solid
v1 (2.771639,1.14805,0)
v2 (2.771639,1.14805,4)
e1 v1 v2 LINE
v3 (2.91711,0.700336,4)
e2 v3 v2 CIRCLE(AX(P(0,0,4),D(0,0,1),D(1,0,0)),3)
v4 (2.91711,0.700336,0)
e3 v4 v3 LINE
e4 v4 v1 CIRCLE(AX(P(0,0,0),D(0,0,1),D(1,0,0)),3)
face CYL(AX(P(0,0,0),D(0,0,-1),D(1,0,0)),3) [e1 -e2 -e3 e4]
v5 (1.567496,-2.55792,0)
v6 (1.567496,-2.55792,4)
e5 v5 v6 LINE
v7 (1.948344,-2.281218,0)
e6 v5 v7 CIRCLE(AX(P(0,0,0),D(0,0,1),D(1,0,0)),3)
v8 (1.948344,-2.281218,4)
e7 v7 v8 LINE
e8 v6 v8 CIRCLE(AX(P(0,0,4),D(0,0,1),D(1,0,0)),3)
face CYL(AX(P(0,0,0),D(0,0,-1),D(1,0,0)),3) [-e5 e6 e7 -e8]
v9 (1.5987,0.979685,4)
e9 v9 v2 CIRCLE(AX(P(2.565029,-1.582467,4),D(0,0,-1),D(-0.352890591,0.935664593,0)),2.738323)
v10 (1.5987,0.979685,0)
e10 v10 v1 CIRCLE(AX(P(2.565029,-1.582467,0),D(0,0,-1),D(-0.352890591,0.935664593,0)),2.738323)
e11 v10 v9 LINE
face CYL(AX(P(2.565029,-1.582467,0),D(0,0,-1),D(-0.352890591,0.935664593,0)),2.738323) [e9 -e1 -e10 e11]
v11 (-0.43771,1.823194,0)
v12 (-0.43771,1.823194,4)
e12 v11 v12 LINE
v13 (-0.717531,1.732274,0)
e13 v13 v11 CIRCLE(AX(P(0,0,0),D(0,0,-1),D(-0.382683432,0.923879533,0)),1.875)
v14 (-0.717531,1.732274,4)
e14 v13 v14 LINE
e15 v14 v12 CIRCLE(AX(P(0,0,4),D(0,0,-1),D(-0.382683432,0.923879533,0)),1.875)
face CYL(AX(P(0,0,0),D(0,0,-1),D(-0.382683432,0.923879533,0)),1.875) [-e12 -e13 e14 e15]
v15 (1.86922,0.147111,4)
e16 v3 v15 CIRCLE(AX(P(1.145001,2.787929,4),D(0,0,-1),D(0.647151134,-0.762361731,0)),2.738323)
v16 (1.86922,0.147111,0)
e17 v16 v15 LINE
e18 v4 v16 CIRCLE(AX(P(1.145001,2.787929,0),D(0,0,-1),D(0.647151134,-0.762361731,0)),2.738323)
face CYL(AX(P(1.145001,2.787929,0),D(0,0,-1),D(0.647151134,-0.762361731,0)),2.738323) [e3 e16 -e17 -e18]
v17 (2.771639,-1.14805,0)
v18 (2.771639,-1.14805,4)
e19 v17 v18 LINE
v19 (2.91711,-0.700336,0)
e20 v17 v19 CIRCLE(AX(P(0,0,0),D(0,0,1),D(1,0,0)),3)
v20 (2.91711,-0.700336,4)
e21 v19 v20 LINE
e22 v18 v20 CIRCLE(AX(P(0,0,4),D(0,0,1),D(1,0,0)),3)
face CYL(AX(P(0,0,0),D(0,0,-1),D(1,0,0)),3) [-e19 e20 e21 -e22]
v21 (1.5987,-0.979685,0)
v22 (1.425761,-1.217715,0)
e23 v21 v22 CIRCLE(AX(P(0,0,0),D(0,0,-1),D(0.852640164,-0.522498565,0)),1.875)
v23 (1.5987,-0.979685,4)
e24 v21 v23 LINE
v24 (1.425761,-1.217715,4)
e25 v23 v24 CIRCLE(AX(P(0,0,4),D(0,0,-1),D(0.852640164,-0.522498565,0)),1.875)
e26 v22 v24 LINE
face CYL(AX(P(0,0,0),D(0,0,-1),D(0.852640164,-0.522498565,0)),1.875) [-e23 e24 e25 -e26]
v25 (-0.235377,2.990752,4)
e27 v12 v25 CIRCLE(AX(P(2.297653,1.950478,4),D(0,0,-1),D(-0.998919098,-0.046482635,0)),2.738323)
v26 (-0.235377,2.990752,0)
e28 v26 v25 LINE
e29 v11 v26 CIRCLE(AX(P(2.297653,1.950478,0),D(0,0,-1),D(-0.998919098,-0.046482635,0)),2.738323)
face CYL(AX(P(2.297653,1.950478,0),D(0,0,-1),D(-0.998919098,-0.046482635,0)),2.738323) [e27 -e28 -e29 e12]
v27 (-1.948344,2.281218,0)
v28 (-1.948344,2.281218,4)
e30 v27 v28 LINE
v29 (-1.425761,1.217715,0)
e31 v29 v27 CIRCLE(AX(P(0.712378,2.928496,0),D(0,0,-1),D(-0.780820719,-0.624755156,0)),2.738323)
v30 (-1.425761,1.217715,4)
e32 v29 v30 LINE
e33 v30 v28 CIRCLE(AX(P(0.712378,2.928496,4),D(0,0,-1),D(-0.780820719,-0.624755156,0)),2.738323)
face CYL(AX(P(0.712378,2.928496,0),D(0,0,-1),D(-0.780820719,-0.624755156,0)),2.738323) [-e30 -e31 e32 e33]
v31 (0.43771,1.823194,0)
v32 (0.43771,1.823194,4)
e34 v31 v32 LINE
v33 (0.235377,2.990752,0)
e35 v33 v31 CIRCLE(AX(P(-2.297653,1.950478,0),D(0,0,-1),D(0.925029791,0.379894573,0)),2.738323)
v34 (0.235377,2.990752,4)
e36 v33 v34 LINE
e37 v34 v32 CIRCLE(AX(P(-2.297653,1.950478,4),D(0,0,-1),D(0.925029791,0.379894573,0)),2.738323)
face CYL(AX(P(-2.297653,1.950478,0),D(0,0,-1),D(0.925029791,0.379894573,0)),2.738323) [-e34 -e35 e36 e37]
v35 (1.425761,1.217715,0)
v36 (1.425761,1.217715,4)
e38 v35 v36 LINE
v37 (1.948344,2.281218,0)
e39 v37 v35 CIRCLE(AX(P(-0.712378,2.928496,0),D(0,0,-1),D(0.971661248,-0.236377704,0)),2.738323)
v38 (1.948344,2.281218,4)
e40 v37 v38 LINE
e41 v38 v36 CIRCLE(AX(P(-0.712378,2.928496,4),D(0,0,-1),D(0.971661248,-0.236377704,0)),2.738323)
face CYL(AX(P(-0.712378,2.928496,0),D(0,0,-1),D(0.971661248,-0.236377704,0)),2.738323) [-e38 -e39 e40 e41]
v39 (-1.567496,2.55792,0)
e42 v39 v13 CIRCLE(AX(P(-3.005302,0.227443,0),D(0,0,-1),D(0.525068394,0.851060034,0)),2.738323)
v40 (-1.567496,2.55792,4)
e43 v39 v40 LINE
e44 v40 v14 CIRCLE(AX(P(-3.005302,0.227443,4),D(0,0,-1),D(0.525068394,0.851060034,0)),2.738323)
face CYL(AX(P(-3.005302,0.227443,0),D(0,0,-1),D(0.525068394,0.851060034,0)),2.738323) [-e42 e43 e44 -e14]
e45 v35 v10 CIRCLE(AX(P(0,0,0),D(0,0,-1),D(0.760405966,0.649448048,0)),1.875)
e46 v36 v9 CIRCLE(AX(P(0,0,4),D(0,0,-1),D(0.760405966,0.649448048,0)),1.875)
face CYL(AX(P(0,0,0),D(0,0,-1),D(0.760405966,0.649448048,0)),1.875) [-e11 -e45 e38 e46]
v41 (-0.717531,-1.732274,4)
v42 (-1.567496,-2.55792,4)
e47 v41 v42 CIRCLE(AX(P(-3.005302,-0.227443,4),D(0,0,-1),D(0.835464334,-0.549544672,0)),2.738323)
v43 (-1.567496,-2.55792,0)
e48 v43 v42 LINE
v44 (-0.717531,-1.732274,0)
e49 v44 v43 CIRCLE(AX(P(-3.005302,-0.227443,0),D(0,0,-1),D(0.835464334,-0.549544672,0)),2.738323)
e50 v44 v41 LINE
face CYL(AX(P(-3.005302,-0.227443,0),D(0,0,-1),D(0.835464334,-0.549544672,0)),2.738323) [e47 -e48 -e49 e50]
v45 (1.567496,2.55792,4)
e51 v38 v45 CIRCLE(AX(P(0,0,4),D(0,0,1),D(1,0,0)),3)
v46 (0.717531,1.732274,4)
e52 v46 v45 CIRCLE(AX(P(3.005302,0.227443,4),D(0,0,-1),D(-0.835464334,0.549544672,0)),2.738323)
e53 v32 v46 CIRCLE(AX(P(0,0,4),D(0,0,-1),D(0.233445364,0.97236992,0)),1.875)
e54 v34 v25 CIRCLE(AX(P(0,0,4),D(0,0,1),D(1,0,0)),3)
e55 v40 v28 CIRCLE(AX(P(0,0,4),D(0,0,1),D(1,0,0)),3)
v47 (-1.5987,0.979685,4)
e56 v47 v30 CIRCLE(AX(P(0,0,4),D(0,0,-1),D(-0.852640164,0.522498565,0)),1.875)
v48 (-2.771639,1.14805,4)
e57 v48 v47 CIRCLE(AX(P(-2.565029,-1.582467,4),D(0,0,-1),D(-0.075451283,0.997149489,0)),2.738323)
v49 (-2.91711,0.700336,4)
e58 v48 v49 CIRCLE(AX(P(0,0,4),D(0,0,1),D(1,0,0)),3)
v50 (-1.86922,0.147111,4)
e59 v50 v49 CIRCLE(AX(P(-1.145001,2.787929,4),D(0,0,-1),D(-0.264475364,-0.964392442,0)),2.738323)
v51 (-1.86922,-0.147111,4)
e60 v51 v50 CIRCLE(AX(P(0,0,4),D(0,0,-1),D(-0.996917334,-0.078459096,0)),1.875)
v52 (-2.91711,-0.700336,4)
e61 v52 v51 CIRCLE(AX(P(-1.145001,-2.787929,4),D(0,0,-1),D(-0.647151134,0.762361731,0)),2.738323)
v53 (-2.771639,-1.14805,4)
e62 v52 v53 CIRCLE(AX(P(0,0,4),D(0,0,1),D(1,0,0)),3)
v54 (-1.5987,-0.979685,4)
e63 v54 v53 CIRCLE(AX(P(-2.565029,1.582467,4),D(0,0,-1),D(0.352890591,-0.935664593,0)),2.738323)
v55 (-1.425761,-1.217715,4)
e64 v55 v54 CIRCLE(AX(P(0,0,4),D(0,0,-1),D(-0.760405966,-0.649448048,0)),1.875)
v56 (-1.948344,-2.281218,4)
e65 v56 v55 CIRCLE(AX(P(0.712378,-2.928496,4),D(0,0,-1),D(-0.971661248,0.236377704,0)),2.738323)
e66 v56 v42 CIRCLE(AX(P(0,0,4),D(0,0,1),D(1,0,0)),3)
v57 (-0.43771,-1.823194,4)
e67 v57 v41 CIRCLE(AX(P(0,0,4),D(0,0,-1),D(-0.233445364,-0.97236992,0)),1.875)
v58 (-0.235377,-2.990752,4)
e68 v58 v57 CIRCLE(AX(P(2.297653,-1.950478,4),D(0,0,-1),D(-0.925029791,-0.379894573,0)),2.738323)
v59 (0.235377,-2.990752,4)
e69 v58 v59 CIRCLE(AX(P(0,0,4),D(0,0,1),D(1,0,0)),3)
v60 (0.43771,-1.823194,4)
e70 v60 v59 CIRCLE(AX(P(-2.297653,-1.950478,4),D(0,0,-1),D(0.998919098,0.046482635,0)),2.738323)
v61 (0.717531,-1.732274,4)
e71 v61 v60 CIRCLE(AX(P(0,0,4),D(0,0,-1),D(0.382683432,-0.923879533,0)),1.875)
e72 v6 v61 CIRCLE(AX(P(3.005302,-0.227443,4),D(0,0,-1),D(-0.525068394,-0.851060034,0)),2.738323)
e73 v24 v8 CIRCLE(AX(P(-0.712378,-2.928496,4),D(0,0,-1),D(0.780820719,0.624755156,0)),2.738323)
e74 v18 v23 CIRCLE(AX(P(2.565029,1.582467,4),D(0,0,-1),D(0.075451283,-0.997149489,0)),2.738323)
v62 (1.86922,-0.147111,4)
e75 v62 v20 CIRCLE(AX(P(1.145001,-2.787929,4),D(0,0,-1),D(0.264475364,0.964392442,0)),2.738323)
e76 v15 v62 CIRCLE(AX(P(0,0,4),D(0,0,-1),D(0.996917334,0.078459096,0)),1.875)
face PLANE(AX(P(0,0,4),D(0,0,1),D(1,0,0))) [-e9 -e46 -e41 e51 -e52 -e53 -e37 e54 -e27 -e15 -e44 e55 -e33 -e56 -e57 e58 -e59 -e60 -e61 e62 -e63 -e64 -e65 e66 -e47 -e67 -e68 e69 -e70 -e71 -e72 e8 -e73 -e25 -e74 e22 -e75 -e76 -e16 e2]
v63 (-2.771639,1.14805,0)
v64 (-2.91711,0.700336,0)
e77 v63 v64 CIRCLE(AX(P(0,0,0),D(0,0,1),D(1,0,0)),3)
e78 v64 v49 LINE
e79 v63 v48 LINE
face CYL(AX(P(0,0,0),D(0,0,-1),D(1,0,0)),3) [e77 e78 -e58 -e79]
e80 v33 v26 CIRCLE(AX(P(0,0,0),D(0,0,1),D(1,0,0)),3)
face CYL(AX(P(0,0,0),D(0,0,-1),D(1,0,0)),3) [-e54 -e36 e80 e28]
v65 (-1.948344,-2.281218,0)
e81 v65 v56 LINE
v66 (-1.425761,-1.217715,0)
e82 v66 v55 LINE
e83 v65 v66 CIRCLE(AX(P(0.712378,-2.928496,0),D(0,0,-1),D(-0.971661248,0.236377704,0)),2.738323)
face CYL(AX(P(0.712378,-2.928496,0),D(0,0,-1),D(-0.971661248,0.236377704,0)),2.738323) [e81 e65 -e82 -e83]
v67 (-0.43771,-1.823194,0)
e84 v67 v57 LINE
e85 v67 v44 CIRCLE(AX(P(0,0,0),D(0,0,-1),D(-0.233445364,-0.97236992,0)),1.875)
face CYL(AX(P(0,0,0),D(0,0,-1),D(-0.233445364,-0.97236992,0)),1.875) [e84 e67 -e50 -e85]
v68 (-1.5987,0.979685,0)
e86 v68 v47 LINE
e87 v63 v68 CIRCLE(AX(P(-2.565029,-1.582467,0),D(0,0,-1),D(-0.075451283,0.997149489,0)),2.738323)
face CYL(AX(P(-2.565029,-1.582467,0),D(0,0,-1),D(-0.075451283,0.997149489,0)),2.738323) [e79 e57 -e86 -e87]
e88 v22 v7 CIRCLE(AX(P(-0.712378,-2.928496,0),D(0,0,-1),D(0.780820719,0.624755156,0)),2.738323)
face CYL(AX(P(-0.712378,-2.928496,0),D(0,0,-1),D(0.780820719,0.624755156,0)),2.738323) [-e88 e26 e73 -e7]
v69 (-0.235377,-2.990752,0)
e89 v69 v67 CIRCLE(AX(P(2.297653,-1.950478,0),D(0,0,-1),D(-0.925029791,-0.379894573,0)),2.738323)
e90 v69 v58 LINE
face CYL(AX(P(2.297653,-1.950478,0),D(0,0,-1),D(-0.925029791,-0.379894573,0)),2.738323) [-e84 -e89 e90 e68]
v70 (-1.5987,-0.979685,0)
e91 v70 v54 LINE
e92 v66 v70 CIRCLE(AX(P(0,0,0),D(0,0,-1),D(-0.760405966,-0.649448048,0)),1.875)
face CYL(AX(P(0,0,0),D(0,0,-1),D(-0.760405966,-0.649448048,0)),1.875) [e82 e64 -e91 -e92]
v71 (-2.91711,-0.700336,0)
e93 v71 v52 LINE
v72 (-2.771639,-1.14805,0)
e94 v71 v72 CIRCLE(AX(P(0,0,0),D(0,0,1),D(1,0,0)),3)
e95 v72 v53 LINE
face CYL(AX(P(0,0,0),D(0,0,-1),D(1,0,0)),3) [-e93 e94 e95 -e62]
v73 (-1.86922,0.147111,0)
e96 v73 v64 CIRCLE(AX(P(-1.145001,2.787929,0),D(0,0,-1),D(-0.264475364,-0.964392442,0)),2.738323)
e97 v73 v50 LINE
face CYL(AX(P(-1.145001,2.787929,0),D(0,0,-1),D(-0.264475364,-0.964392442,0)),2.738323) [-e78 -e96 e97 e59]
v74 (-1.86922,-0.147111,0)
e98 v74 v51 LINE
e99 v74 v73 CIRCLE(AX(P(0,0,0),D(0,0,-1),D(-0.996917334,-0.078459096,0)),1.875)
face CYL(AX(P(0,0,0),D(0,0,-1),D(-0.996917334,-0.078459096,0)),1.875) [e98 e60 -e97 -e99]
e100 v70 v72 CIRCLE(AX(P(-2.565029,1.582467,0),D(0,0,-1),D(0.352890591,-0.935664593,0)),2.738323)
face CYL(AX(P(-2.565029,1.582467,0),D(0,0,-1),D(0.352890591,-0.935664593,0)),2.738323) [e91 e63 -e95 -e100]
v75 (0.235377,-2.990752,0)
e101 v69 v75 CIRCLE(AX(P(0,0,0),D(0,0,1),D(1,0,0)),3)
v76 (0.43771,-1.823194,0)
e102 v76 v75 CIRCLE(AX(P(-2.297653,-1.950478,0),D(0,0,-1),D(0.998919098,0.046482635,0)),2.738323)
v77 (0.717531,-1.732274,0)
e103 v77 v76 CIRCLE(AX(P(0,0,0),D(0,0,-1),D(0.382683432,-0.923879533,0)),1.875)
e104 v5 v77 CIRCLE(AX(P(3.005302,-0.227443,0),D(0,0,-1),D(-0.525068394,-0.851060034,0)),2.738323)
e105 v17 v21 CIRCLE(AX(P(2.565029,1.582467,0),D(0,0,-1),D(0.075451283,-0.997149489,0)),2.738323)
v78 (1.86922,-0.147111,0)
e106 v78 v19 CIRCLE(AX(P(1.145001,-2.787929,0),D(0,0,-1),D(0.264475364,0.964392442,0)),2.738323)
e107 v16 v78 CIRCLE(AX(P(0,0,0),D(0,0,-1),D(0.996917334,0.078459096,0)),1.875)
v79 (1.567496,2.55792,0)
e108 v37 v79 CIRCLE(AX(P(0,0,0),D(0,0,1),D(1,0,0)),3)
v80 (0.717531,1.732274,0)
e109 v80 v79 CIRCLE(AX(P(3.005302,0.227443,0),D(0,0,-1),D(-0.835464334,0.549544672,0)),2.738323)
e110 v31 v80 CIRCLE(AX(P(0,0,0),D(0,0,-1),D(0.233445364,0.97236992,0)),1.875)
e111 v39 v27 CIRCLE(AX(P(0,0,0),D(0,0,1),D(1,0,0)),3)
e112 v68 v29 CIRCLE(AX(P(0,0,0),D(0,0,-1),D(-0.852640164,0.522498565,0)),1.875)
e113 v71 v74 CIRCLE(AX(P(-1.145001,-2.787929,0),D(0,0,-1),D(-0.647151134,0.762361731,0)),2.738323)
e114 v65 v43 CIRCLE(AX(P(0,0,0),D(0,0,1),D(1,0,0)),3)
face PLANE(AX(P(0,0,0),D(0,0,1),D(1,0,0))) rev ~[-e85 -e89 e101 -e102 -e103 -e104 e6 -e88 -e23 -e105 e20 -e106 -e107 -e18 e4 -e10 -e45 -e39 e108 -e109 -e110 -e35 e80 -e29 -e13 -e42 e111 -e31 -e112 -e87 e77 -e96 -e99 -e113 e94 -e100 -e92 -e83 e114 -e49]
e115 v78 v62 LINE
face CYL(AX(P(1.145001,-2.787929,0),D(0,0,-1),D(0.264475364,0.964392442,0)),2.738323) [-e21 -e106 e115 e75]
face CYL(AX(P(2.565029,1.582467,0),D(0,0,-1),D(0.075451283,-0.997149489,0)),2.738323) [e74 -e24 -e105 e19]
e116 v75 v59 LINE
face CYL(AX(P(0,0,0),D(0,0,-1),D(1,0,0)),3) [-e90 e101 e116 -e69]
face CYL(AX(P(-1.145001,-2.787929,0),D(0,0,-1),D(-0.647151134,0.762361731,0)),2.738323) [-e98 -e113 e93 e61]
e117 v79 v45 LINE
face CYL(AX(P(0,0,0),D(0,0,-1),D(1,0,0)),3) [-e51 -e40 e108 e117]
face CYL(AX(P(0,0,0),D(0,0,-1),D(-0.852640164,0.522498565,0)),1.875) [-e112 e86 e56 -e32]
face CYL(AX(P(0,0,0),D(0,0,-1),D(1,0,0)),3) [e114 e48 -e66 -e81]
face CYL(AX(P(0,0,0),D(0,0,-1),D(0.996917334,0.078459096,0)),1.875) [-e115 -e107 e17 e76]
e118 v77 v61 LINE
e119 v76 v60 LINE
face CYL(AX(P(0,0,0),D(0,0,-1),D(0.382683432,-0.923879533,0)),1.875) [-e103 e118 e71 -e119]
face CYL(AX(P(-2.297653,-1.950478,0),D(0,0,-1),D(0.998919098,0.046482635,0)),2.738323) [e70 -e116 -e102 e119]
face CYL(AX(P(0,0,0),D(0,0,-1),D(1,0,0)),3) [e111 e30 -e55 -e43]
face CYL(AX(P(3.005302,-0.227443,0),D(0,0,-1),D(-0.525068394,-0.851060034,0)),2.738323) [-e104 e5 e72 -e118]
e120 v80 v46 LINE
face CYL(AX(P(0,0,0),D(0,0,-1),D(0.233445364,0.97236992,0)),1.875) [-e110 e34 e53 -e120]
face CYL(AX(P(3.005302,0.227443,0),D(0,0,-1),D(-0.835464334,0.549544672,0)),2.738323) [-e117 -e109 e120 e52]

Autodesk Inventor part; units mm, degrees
sketch "Sketch1" plane through (0, 0, 0) normal (0, 0, 1) x (1, 0, 0)
  circle A0 centre (0, 0) radius 3
  dimension "d0" = 6
extrude "Extrusion1" add sketch "Sketch1" along normal blind 4
ref_plane "Work Plane2" through (0, 0, 2) normal (0, 0, 1) x (1, 0, 0)
sketch "Sketch2" plane through (0, 0, 0) normal (0, 0, -1) x (-1, 0, 0)
  circle A0 centre (0, 0) radius 3 projected
  circle A1 centre (0, 0) radius 2.5
  dimension "d3" = 5
surface extrude "Flankendurchmesser" sketch "Sketch2" against normal through all shown no curves A1
ref_plane "Work Plane8" through (0, 0, 0) normal (0.9510565, 0.309017, 0) x (0, 0, 1)
ref_plane "Work Plane9" through (0, 0, 0) normal (1, 0, 0) x (0, 1, 0)
spur gear teeth "Stirnzahnrad" teeth 10 pitch diameter 5 tip diameter 6 root diameter 3.75 face width 4 start plane through (0, 0, 0) normal (0, 0, -1) x (-1, 0, 0)
equation "\"d0\" = da_da"
equation "\"d1\" = da_b"
equation "\"d3\" = da_dw"
equation "\"d16\" = da_aw"
equation "\"d43\" = da_aw"
equation "\"d46\" = da_aw"
equation "\"da_da\" = 6"
equation "\"da_b\" = 4"
equation "\"da_dw\" = 5"
equation "\"da_aw\" = 15"
properties part number "Stirnzahnrad1" material "Steel"
